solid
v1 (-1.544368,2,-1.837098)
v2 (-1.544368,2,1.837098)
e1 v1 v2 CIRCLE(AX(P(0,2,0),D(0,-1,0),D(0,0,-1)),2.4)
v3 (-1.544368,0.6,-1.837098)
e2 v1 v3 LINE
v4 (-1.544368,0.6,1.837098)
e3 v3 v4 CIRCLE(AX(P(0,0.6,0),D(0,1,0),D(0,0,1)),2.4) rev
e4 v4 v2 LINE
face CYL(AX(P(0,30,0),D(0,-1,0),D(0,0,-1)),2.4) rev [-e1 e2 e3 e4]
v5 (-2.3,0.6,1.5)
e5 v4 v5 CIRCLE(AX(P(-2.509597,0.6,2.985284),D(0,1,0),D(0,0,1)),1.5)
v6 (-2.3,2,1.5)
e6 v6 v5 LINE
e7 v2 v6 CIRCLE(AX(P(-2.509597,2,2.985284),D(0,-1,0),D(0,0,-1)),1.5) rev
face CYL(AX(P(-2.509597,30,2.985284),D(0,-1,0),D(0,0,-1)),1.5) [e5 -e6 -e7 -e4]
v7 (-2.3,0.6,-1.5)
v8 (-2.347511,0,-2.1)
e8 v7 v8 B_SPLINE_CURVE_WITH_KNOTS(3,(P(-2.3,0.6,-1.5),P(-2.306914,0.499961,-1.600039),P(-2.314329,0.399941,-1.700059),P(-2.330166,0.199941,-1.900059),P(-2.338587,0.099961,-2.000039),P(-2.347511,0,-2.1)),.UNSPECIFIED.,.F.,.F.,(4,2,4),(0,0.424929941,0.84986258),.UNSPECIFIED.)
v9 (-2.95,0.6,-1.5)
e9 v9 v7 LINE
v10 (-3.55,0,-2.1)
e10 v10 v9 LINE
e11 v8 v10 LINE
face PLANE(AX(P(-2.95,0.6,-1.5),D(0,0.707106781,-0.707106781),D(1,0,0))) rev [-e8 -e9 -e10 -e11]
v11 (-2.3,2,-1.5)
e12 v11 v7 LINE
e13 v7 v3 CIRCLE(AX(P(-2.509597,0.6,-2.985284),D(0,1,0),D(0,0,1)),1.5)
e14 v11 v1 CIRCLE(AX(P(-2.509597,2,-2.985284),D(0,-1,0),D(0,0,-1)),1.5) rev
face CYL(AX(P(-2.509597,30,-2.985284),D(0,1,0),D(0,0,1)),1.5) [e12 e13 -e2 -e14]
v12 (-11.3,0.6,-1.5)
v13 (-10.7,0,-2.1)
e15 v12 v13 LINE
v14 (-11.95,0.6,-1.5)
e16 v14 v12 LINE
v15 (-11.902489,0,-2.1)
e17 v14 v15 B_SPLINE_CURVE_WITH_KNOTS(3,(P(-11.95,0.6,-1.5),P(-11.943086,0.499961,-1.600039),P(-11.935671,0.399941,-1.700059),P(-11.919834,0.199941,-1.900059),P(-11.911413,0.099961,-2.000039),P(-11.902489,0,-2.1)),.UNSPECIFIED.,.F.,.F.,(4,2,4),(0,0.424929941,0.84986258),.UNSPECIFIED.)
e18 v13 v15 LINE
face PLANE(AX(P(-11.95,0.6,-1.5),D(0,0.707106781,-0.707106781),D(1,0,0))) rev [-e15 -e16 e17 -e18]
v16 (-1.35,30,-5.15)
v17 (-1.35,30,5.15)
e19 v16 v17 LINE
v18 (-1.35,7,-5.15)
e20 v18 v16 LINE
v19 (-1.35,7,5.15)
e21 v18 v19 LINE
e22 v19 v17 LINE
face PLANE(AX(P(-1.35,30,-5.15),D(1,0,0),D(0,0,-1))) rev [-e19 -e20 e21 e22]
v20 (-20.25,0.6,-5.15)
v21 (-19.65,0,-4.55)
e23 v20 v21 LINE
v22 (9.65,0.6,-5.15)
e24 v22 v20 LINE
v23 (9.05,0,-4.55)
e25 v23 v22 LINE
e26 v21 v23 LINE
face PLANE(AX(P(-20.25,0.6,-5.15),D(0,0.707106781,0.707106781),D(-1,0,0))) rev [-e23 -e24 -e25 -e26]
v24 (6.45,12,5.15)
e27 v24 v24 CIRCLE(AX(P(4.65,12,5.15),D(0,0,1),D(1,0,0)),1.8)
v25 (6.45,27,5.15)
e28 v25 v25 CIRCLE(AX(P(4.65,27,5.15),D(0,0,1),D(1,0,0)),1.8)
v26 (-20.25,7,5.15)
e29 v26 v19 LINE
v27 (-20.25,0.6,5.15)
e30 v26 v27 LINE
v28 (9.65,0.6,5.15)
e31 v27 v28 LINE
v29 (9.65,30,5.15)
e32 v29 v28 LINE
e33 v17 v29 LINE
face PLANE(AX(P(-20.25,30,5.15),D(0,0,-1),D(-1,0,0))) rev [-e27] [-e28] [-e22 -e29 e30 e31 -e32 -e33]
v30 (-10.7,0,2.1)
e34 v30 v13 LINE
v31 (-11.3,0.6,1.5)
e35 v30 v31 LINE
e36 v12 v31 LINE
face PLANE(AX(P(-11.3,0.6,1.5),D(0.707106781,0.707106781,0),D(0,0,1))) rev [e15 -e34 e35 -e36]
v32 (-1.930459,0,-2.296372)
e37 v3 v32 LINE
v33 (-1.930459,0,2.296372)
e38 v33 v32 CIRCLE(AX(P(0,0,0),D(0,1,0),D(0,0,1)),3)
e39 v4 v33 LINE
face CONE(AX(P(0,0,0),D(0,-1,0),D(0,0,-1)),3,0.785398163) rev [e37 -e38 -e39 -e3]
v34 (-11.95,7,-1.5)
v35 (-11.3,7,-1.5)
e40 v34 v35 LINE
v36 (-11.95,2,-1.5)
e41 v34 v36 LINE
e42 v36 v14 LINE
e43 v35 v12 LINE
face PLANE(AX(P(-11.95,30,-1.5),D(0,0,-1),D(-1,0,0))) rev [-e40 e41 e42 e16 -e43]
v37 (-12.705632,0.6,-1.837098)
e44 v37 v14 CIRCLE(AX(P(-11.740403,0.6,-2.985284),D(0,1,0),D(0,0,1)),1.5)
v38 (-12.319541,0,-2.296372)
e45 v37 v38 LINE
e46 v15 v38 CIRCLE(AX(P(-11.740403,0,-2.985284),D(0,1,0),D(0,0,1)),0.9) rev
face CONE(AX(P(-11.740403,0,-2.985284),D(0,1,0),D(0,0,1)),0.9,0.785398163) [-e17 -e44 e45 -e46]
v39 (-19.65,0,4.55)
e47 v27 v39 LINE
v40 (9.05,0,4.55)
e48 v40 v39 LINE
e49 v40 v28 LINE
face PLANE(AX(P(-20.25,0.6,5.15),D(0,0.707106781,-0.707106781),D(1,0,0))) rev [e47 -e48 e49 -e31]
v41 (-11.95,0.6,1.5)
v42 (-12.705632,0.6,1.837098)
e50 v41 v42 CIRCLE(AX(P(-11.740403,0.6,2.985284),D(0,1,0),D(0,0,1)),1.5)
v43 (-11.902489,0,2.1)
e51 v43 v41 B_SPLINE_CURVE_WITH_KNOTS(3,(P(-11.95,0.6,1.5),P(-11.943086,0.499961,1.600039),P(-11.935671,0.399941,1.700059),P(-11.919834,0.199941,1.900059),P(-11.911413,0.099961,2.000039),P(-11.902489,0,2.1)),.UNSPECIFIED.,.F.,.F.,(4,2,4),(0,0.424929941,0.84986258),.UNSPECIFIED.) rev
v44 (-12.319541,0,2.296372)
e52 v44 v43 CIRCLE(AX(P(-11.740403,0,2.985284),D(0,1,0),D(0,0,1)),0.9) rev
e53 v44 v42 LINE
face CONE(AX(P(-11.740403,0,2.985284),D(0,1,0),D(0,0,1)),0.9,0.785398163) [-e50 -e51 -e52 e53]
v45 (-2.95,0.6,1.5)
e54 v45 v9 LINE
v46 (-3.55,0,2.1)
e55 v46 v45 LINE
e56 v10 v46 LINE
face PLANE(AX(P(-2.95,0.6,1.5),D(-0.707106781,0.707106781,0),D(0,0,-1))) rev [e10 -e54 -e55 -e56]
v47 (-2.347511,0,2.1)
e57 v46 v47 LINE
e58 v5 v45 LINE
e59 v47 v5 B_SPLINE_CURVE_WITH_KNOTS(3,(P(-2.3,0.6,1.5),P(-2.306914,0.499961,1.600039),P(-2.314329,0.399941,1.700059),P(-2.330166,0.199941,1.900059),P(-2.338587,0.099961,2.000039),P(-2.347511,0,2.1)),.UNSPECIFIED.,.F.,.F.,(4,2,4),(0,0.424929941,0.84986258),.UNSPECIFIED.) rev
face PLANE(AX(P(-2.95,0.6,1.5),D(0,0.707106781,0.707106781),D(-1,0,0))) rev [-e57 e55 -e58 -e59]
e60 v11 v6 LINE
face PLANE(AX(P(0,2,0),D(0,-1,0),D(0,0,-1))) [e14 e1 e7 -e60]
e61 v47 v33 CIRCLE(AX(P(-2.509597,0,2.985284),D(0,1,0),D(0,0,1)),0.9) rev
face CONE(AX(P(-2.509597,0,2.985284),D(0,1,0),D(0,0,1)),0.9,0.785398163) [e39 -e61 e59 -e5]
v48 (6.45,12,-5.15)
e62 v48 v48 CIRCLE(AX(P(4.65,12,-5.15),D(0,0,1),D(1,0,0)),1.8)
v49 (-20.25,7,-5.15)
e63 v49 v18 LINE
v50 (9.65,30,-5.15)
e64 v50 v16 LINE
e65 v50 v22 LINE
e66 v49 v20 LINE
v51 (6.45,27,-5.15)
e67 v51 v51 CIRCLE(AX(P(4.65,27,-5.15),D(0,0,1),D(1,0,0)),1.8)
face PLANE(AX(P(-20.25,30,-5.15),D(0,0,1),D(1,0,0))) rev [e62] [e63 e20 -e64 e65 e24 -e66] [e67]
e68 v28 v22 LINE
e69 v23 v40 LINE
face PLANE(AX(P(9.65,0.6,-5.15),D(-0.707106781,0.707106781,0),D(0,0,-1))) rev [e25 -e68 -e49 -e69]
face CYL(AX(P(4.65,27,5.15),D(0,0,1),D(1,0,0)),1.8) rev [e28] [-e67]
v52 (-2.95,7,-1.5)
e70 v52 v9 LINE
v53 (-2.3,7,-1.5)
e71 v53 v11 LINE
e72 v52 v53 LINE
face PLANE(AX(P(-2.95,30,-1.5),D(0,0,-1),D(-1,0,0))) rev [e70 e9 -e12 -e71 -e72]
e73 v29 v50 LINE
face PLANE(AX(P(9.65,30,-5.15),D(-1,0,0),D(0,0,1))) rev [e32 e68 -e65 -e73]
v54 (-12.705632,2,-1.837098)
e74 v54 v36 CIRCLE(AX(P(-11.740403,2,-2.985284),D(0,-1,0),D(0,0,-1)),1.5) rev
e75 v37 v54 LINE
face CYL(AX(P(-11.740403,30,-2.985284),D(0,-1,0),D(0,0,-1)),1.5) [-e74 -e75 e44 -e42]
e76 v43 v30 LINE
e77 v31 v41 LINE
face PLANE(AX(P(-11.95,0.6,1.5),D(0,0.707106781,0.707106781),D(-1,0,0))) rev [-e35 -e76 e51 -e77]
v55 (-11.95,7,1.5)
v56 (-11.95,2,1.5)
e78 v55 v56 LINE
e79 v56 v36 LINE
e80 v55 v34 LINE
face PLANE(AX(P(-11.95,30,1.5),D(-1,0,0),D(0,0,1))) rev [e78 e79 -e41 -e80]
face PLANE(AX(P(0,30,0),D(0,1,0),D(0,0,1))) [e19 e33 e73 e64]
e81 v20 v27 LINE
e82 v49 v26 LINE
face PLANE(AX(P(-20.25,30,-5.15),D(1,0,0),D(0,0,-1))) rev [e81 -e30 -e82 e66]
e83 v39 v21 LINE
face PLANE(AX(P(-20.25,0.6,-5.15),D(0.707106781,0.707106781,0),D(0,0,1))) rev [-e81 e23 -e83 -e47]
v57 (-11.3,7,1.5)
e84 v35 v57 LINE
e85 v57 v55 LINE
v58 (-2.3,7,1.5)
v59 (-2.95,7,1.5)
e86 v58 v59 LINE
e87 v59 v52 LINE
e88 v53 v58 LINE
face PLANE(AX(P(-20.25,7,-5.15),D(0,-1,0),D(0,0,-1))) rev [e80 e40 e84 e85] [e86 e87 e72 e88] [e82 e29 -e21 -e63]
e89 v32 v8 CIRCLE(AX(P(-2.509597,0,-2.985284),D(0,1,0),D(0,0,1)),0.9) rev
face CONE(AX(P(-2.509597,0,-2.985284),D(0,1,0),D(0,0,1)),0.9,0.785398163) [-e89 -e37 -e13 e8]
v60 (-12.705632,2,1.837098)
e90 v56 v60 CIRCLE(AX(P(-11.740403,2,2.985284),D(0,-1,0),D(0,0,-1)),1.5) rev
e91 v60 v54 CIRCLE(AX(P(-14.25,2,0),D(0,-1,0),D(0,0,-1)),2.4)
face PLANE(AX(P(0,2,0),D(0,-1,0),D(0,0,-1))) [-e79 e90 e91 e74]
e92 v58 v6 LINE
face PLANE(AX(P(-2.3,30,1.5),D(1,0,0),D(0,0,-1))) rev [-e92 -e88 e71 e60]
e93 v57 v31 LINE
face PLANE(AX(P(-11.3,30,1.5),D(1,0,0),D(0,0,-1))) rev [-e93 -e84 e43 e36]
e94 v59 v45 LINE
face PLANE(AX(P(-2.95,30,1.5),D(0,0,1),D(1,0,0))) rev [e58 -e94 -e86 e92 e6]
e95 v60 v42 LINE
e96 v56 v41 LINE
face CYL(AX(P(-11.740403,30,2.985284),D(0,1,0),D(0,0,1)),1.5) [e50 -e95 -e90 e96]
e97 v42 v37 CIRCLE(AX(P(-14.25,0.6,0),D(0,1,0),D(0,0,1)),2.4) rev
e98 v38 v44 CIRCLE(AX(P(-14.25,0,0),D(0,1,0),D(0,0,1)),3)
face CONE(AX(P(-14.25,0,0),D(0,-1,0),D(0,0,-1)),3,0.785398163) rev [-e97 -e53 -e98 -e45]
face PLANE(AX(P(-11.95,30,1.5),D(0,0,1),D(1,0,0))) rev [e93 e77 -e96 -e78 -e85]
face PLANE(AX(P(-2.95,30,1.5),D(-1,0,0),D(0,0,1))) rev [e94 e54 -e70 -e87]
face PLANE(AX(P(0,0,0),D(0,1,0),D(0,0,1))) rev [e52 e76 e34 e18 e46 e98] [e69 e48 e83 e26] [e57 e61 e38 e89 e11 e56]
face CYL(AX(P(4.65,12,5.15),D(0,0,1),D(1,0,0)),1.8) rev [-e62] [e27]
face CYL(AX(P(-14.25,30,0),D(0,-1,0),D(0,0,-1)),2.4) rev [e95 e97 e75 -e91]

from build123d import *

# Parameters (mm, degrees)
SKETCH1_W            = 29.9
SKETCH1_H            = 10.3
SKETCH1_R            = 2.4
BOSS_EXTRUDE1_DEPTH  = 30
BOSS_EXTRUDE3_START  = -2
SKETCH4_W            = 29.9
SKETCH4_H            = 10.3
BOSS_EXTRUDE3_DEPTH  = 28
SKETCH2_W            = 18.9
SKETCH2_H            = 23
CUT_EXTRUDE1_DEPTH   = 38.631801711
SKETCH3_W            = 0.65
SKETCH3_H            = 3
CUT_EXTRUDE2_DEPTH   = 37.559335333
M3_CLEARANCE_HOLE1_D = 3.6
FILLET1_R            = 1.5
CHAMFER1_SIZE        = 0.6


with BuildPart() as part:
    # Sketch1 → Boss-Extrude1 (new body)
    with BuildSketch(Plane(origin=(0, 0, 0), x_dir=(1, 0, 0), z_dir=(0, 1, 0))):
        with Locations((-5.3, 0)):
            Rectangle(SKETCH1_W, SKETCH1_H)
        with Locations(Location((0, 0, 0), (0, 0, 270))):
            Circle(SKETCH1_R, mode=Mode.SUBTRACT)
        with Locations(Location((-14.25, 0, 0), (0, 0, 270))):
            Circle(SKETCH1_R, mode=Mode.SUBTRACT)
    extrude(amount=BOSS_EXTRUDE1_DEPTH)

    # Sketch4 → Boss-Extrude3 (add)
    with BuildSketch(Plane.XZ.offset(BOSS_EXTRUDE3_START)):
        with Locations((-5.3, 0)):
            Rectangle(SKETCH4_W, SKETCH4_H)
    extrude(amount=-BOSS_EXTRUDE3_DEPTH)

    # Sketch2 → Cut-Extrude1 (cut, through all)
    with BuildSketch(Plane.XY.offset(5.15)):
        with Locations((-10.8, 18.5)):
            Rectangle(SKETCH2_W, SKETCH2_H)
    extrude(amount=-CUT_EXTRUDE1_DEPTH, mode=Mode.SUBTRACT)

    # Sketch3 → Cut-Extrude2 (cut, through all)
    with BuildSketch(Plane.XZ):
        with Locations((-11.625, 0)):
            Rectangle(SKETCH3_W, SKETCH3_H)
        with Locations((-2.625, 0)):
            Rectangle(SKETCH3_W, SKETCH3_H)
    extrude(amount=-CUT_EXTRUDE2_DEPTH, mode=Mode.SUBTRACT)

    # M3 Clearance Hole1 (through all)
    with Locations(Plane.XY.offset(5.15)):
        with Locations((4.65, 12), (4.65, 27)):
            Hole(M3_CLEARANCE_HOLE1_D / 2)

    # Fillet1
    # the kernel refuses this fillet: 1.5 mm, written as the material it takes off along each edge
    with BuildSketch(Plane(origin=(-2.3, 2, 0.68556546), x_dir=(0.5486256089659476, 0, 0.8360681438655243), z_dir=(0, -1, 0)), Plane(origin=(-11.95, 2, -0.68556546), x_dir=(-0.5486256089659476, 0, -0.8360681438655244), z_dir=(0, -1, 0))) as fillet1_piece_1:
        with BuildLine():
            CenterArc((1.80773108, 1.436922187), FILLET1_R, 221.305086591, 32.01998054)
            Line((0.680922774, 0.446819645), (0, 0))
            ThreePointArc((0, 0), (0.688659459, 0.100924501), (1.377318918, 0))
        make_face()
    extrude(amount=5.443297295, mode=Mode.SUBTRACT)
    with BuildSketch(Plane(origin=(-2.3, 2, -0.68556546), x_dir=(0.5486256089659476, 0, -0.8360681438655245), z_dir=(0, -1, 0)), Plane(origin=(-11.95, 2, 0.68556546), x_dir=(-0.5486256089659488, 0, 0.8360681438655235), z_dir=(0, -1, 0))) as fillet1_piece_2:
        with BuildLine():
            CenterArc((1.80773108, -1.436922187), FILLET1_R, 106.67493287, 32.01998054)
            Line((0.680922774, -0.446819645), (0, 0))
            ThreePointArc((0, 0), (0.688659459, -0.100924501), (1.377318918, 0))
        make_face()
    extrude(amount=5.443297295, mode=Mode.SUBTRACT)

    # Chamfer1
    chamfer1_edges = [part.edges().sort_by_distance(p)[0] for p in [
        (2.4, 0, 0),
        (-16.65, 0, 0),
        (-12.351519212, 0, 1.61541677),
        (-12.351519212, 0, -1.61541677),
        (-1.898480788, 0, 1.61541677),
        (-1.898480788, 0, -1.61541677),
        (-5.3, 0, -5.15),
        (9.65, 0, 0),
        (-5.3, 0, 5.15),
        (-20.25, 0, 0),
        (-11.625, 0, -1.5),
        (-11.3, 0, 0),
        (-11.625, 0, 1.5),
        (-2.625, 0, 1.5),
        (-2.95, 0, 0),
        (-2.625, 0, -1.5),
    ]]
    chamfer(chamfer1_edges, length=CHAMFER1_SIZE)


solid = part.part
